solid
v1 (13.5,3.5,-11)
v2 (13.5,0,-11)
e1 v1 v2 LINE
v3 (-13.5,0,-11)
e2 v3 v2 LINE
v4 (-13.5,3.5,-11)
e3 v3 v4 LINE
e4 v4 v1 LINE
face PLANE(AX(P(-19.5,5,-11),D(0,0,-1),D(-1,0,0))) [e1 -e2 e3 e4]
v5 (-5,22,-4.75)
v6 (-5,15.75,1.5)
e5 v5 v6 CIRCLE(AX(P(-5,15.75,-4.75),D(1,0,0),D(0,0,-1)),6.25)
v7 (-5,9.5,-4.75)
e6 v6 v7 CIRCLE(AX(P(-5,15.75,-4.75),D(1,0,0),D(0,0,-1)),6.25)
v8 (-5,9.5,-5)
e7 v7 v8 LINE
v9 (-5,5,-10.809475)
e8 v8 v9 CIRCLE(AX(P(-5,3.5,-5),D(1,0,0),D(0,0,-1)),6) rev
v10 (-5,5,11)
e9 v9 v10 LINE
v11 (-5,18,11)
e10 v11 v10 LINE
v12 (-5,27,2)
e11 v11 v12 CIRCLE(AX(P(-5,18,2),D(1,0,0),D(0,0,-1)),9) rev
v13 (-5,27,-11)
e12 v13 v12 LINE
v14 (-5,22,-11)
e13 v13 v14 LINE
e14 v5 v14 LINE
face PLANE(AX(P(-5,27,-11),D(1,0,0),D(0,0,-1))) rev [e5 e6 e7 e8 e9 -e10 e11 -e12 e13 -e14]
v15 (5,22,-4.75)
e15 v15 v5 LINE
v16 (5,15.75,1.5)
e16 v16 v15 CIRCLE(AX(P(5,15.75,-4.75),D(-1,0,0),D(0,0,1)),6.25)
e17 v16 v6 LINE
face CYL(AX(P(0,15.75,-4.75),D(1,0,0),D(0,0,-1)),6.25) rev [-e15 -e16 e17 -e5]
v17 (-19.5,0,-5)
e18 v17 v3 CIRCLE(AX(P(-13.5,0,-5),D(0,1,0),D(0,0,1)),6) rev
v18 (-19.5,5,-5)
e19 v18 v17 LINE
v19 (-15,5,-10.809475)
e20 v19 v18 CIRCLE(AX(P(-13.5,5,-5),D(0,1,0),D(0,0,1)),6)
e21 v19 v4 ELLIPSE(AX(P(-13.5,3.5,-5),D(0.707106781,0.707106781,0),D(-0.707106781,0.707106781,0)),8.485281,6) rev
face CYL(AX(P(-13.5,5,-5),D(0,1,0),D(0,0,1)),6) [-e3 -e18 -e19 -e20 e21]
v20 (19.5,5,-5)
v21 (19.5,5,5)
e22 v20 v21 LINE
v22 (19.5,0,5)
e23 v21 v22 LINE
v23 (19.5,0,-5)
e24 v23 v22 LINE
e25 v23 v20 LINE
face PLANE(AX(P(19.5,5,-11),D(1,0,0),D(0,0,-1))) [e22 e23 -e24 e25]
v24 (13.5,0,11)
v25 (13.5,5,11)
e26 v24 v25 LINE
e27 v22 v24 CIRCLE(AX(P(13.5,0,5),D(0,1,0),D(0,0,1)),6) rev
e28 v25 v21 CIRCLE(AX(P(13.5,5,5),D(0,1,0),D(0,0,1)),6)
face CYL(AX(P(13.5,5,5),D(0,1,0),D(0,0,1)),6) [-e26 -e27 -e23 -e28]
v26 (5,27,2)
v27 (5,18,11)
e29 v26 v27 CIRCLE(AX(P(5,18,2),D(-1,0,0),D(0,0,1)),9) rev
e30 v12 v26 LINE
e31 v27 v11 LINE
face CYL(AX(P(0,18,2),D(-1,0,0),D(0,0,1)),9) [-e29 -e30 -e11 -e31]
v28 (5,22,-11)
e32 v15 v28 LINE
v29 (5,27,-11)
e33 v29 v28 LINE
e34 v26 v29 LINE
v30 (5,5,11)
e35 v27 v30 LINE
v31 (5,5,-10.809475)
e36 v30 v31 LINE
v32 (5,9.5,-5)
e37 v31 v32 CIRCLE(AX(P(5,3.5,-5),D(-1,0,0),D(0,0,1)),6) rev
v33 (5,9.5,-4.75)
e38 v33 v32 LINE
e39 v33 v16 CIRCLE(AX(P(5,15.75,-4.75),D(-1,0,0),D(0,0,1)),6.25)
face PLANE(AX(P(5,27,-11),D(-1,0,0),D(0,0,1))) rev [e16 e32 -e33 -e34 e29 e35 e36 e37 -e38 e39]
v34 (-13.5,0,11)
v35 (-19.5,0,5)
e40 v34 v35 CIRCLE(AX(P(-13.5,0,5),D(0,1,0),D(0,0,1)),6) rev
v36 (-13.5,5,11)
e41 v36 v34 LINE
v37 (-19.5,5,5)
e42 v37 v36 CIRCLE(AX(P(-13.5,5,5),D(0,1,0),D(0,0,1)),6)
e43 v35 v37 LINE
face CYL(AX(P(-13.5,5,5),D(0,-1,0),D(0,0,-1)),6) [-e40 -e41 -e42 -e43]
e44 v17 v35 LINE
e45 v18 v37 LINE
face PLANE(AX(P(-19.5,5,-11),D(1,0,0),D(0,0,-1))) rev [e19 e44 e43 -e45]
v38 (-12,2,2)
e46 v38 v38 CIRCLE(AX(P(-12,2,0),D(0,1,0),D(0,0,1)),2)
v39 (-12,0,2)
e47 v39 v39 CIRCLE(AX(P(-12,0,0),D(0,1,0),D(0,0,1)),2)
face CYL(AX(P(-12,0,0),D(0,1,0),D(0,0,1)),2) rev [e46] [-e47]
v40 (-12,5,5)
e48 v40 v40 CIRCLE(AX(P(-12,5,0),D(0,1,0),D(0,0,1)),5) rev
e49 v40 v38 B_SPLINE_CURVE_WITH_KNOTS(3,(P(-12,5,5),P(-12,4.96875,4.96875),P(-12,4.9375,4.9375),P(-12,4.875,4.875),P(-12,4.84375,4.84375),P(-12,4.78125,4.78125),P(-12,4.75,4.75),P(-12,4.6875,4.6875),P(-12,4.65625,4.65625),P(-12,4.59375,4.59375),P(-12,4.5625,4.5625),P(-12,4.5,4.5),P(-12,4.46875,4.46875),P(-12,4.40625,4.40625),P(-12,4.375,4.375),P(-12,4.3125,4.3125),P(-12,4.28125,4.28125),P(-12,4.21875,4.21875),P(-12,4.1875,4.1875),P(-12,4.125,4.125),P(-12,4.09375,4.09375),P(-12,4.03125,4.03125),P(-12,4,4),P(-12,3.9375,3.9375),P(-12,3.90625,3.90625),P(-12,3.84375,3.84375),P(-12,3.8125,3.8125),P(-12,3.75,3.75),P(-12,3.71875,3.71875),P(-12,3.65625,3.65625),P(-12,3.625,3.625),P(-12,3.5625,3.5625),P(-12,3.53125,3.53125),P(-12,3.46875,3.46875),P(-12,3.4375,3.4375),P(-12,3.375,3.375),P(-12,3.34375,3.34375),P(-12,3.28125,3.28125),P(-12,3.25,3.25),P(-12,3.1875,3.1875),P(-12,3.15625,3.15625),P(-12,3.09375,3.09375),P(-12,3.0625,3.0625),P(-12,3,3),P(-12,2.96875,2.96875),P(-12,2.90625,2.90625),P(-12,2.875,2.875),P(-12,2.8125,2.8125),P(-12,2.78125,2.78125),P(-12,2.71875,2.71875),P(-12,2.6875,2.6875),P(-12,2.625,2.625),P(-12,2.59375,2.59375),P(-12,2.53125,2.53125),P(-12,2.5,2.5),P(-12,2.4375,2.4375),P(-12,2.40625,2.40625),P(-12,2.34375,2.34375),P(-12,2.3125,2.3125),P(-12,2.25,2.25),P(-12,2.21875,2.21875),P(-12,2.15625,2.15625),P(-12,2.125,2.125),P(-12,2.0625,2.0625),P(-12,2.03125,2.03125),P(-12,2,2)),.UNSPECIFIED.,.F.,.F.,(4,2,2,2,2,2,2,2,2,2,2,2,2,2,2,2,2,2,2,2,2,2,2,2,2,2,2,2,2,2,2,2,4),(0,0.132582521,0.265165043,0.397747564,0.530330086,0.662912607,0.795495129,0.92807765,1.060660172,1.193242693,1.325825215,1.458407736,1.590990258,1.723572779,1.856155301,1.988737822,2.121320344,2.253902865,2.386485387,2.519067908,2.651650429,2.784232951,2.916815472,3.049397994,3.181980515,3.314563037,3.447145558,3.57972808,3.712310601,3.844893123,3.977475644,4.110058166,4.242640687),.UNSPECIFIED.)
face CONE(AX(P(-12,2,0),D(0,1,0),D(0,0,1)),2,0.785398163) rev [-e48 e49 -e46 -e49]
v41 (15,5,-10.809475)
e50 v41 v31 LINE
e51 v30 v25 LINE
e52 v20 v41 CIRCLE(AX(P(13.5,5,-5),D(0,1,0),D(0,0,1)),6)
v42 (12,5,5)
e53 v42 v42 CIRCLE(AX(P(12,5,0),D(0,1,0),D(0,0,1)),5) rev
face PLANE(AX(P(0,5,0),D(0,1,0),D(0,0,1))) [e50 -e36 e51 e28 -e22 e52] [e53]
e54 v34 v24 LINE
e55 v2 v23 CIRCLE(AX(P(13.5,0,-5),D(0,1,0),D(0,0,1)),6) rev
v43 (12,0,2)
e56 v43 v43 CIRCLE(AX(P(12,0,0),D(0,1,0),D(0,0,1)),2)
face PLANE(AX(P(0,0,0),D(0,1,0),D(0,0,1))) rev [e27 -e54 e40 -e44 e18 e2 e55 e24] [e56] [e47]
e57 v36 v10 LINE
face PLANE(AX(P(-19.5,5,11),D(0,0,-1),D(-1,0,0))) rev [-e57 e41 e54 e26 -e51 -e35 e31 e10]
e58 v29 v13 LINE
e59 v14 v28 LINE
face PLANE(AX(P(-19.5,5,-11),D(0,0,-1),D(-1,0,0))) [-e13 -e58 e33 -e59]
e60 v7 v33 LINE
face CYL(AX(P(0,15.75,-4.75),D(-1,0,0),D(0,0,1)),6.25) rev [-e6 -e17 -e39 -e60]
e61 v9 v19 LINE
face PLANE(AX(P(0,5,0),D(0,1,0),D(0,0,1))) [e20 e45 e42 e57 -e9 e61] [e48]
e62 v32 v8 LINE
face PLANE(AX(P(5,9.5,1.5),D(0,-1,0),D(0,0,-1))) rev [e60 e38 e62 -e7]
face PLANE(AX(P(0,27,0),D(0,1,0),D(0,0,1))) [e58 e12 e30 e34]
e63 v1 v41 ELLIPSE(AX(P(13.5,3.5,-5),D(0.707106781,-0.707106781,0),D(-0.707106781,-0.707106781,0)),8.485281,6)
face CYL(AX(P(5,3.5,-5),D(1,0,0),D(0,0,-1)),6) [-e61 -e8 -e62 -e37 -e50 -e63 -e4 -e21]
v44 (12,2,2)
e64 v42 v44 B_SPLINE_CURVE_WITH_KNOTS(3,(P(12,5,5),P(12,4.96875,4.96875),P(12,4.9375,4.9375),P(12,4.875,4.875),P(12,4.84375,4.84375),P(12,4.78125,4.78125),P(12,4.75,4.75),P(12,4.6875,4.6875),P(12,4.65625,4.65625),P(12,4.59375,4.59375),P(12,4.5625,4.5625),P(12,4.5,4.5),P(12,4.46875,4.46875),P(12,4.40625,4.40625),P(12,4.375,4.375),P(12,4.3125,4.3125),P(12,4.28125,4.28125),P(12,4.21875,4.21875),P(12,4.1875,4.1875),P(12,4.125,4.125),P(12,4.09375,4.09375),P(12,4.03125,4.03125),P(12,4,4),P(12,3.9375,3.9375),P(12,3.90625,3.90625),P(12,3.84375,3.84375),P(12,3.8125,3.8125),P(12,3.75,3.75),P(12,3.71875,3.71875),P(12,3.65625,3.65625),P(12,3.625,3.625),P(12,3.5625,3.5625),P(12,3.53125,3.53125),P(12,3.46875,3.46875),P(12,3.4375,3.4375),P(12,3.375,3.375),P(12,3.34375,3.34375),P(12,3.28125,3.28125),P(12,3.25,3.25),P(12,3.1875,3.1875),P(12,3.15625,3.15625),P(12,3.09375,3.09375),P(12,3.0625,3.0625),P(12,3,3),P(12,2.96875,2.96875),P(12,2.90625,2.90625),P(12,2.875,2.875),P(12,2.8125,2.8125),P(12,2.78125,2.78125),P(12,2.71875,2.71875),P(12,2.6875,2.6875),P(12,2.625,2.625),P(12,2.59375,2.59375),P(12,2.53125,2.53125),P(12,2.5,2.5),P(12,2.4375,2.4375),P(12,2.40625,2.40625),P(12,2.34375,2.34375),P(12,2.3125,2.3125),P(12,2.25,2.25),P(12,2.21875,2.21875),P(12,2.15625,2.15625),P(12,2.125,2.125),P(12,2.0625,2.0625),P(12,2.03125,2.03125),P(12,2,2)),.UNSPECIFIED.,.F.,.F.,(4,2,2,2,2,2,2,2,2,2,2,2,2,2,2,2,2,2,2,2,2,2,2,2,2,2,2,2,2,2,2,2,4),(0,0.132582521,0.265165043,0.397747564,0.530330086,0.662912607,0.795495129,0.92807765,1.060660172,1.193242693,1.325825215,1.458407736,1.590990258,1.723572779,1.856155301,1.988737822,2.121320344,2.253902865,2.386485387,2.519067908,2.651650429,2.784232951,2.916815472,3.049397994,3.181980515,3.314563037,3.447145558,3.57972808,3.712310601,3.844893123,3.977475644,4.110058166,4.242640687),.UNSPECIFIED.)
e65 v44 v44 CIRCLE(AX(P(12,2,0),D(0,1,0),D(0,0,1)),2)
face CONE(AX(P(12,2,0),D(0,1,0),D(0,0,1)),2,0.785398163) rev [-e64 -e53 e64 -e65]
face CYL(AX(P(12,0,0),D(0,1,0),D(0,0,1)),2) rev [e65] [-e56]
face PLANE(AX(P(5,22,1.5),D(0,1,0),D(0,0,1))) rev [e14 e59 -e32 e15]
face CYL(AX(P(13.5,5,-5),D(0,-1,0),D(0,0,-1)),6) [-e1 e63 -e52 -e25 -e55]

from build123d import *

# Parameters (mm, degrees)
SKETCH1_W           = 39
SKETCH1_H           = 22
BOSS_EXTRUDE1_DEPTH = 5
SKETCH2_W           = 10
SKETCH2_H           = 22
BOSS_EXTRUDE2_DEPTH = 22
SKETCH3_W           = 10
SKETCH3_H           = 12.5
CUT_EXTRUDE1_DEPTH  = 12.5
FILLET1_R           = 6.25
FILLET2_R           = 6
FILLET3_R           = 9
SKETCH5_R           = 2
CUT_EXTRUDE3_DEPTH  = 32.388692231
FILLET4_R           = 6
CHAMFER4_SIZE       = 3


# Some blends are built 0.0001 mm under size
with BuildPart() as part:
    # Sketch1 → Boss-Extrude1 (new body)
    with BuildSketch(Plane(origin=(0, 0, 0), x_dir=(1, 0, 0), z_dir=(0, 1, 0))):
        Rectangle(SKETCH1_W, SKETCH1_H)
    extrude(amount=BOSS_EXTRUDE1_DEPTH)

    # Sketch2 → Boss-Extrude2 (add)
    with BuildSketch(Plane(origin=(0, 5, 0), x_dir=(1, 0, 0), z_dir=(0, 1, 0))):
        Rectangle(SKETCH2_W, SKETCH2_H)
    extrude(amount=BOSS_EXTRUDE2_DEPTH)

    # Sketch3 → Cut-Extrude1 (cut)
    with BuildSketch(Plane(origin=(0, 0, -11), x_dir=(-1, 0, 0), z_dir=(0, 0, -1))):
        with Locations((0, 15.75)):
            Rectangle(SKETCH3_W, SKETCH3_H)
    extrude(amount=-CUT_EXTRUDE1_DEPTH, mode=Mode.SUBTRACT)

    # Fillet1
    fillet1_edges = [part.edges().sort_by_distance(p)[0] for p in [
        (0, 22, 1.5),
        (0, 9.5, 1.5),
    ]]
    fillet(fillet1_edges, radius=FILLET1_R - 0.0001)  # a hair under: the kernel refuses the full size

    # Fillet2
    fillet2_edges = [part.edges().sort_by_distance(p)[0] for p in [
        (-19.5, 2.5, -11),
        (19.5, 2.5, -11),
        (19.5, 2.5, 11),
        (-19.5, 2.5, 11),
    ]]
    fillet(fillet2_edges, radius=FILLET2_R)

    # Fillet3
    fillet3_edges = [part.edges().sort_by_distance(p)[0] for p in [
        (0, 27, 11),
    ]]
    fillet(fillet3_edges, radius=FILLET3_R)

    # Sketch5 → Cut-Extrude3 (cut, through all)
    with BuildSketch(Plane(origin=(0, 5, 0), x_dir=(1, 0, 0), z_dir=(0, 1, 0))):
        with Locations(Location((-12, 0, 0), (0, 0, 270))):
            Circle(SKETCH5_R)
        with Locations(Location((12, 0, 0), (0, 0, 270))):
            Circle(SKETCH5_R)
    extrude(amount=-CUT_EXTRUDE3_DEPTH, mode=Mode.SUBTRACT)

    # Fillet4
    # the kernel refuses this fillet: 6 mm, written as the material it takes off along each edge
    with BuildSketch(Plane(origin=(-20, 9.5, -11), x_dir=(0, -1, 0), z_dir=(1, 0, 0))) as fillet4_piece_1:
        with BuildLine():
            CenterArc((FILLET4_R, -FILLET4_R), FILLET4_R, 90, 90)
            Line((0, -FILLET4_R), (0, 0))
            Line((0, 0), (FILLET4_R, 0))
        make_face()
    extrude(amount=40, mode=Mode.SUBTRACT)

    # Chamfer4
    chamfer4_edges = [part.edges().sort_by_distance(p)[0] for p in [
        (-12, 5, -2),
        (12, 5, -2),
    ]]
    chamfer(chamfer4_edges, length=CHAMFER4_SIZE)


solid = part.part
